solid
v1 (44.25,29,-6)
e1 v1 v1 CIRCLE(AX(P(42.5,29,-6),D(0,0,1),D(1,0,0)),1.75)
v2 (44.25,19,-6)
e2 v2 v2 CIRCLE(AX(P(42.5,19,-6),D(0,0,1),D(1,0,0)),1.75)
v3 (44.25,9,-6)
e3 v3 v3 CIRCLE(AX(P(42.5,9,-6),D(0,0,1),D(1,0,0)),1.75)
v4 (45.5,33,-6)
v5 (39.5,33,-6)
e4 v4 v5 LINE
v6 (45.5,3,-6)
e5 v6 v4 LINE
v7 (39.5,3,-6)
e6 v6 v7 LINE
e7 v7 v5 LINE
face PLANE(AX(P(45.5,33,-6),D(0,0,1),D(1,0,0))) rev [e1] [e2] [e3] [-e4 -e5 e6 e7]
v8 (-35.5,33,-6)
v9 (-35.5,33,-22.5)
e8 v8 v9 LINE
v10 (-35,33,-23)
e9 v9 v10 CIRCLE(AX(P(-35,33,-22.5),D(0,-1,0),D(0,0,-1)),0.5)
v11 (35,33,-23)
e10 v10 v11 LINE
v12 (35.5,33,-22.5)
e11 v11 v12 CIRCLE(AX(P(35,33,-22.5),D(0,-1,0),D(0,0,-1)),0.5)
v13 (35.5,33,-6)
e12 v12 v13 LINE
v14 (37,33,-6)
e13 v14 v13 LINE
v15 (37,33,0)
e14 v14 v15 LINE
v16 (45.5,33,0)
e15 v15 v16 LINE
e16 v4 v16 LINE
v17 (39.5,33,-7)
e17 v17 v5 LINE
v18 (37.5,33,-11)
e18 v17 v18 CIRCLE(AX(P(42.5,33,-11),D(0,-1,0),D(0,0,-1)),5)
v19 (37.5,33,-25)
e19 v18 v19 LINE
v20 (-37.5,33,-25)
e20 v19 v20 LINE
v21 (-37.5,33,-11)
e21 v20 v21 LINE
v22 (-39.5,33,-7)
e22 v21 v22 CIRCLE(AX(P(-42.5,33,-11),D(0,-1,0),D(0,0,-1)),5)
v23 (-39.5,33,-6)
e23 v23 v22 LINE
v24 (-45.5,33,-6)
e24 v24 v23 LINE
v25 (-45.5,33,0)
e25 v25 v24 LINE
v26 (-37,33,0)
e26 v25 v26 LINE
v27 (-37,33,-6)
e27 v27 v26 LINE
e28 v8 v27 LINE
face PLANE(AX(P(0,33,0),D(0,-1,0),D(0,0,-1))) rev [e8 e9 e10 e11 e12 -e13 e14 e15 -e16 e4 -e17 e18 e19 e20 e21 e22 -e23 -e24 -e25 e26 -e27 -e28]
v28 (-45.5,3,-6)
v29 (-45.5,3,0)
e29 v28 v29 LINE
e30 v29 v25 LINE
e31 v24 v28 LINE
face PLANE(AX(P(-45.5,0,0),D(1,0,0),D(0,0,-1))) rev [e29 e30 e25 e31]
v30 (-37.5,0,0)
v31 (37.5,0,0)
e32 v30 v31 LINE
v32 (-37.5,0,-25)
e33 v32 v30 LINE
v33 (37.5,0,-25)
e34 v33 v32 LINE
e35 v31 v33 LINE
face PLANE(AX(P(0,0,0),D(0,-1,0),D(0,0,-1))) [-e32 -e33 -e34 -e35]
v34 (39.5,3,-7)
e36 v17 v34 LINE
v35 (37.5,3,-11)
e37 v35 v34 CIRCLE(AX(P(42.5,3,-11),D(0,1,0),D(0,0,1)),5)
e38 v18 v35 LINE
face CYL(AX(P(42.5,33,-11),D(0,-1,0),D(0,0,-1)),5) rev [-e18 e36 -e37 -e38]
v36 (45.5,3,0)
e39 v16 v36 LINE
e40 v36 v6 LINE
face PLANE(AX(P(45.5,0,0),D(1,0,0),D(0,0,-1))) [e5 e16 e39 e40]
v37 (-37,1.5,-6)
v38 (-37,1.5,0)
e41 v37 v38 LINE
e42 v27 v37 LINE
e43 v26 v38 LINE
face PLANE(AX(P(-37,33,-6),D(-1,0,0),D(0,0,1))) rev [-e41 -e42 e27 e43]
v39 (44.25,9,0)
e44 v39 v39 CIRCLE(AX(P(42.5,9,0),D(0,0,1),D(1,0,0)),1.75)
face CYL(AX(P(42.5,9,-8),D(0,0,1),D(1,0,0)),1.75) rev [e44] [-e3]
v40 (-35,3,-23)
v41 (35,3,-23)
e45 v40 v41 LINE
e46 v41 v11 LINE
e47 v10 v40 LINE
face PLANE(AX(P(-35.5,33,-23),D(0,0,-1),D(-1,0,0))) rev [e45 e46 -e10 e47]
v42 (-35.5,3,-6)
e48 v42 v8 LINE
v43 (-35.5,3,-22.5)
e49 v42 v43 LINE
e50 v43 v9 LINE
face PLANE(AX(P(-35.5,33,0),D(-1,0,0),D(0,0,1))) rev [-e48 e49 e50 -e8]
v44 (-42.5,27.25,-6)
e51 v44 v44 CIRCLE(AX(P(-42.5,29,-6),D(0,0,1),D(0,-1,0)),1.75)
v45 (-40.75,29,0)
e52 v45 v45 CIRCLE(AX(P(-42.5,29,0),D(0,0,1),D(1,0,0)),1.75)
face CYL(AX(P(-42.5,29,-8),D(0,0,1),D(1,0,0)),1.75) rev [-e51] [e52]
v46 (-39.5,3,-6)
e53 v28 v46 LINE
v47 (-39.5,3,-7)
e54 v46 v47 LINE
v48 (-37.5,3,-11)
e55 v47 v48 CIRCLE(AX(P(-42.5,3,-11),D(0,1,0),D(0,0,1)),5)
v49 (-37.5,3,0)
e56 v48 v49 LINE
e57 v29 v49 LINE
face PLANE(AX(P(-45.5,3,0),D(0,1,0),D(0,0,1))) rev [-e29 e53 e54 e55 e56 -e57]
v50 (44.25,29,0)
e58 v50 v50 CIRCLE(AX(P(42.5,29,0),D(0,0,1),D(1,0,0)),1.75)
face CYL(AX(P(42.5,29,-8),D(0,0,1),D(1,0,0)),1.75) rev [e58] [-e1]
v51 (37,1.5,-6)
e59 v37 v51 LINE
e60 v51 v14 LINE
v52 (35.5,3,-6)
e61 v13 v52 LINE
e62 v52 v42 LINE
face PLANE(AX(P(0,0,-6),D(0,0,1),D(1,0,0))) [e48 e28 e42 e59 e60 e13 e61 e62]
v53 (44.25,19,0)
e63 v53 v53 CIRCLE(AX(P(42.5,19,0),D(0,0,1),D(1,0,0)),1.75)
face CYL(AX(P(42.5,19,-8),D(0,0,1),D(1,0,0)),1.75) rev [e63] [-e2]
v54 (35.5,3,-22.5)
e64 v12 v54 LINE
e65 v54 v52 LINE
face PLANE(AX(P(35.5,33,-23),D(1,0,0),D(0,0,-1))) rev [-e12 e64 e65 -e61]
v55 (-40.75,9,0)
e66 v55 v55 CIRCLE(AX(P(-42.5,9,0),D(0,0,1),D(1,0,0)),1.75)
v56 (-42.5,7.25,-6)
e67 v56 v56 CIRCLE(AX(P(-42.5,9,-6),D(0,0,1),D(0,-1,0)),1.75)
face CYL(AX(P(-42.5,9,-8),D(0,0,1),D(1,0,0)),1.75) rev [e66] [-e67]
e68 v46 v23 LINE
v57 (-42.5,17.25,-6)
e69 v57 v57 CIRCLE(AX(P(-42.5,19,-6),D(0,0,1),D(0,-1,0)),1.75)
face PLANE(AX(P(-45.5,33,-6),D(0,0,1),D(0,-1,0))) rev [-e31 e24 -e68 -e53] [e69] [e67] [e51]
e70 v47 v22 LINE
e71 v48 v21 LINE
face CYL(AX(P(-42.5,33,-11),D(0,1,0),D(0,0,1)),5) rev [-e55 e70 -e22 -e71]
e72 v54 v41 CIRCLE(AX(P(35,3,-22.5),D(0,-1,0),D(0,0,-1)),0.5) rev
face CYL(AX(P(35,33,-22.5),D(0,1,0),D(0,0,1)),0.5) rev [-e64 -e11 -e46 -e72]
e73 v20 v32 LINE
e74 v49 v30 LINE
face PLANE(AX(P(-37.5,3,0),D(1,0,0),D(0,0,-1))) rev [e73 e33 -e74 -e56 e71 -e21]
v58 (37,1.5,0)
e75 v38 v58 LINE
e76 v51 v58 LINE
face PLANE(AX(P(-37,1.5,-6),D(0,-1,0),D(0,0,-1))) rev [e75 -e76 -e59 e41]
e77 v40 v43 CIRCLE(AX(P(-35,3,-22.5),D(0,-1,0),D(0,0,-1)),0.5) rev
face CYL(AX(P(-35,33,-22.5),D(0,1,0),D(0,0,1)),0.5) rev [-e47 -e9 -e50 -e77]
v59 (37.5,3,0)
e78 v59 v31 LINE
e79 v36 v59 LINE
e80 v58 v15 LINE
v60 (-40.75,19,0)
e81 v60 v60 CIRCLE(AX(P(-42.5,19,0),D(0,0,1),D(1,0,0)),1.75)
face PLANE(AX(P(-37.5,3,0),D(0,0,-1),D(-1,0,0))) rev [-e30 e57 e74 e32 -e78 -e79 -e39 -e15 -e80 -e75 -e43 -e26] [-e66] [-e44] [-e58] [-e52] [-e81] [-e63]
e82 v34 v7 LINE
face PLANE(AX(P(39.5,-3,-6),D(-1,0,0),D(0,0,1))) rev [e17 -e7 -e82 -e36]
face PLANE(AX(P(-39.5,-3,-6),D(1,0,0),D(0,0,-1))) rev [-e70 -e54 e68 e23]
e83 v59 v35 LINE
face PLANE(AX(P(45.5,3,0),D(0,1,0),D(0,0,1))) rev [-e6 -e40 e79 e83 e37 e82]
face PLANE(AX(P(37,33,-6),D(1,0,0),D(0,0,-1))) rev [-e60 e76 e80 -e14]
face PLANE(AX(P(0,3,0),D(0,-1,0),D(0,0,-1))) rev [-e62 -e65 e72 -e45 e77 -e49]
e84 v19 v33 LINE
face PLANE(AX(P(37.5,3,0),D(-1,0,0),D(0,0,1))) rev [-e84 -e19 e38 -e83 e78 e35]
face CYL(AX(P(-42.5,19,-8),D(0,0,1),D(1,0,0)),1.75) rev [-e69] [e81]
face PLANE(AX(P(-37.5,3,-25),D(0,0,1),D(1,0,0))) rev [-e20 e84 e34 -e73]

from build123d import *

# Parameters (mm, degrees)
SKETCH2_W           = 75
SKETCH2_H           = 25
BOSS_EXTRUDE1_DEPTH = 3
BOSS_EXTRUDE2_DEPTH = 30
SKETCH5_W           = 6
SKETCH5_H           = 30
BOSS_EXTRUDE3_DEPTH = 8
SKETCH6_W           = 6
SKETCH6_H           = 30
BOSS_EXTRUDE4_DEPTH = 8
SKETCH8_R           = 1.75
CUT_EXTRUDE1_DEPTH  = 8
CUT_EXTRUDE2_DEPTH  = 6
FILLET1_R           = 5
FILLET2_R           = 5
SKETCH13_W          = 6
SKETCH13_H          = 2
CUT_EXTRUDE3_DEPTH  = 36
FILLET3_R           = 0.5


with BuildPart() as part:
    # Sketch2 → Boss-Extrude1 (new body)
    with BuildSketch(Plane(origin=(0, 0, 0), x_dir=(1, 0, 0), z_dir=(0, 1, 0))):
        with Locations((0, 12.5)):
            Rectangle(SKETCH2_W, SKETCH2_H)
    extrude(amount=BOSS_EXTRUDE1_DEPTH)

    # Sketch3 → Boss-Extrude2 (add)
    with BuildSketch(Plane(origin=(0, 3, 0), x_dir=(1, 0, 0), z_dir=(0, 1, 0))):
        Polygon((-35.5, 0), (-35.5, 23), (35.5, 23), (35.5, 0), (37.5, 0), (37.5, 25), (-37.5, 25), (-37.5, 0), align=None)
    extrude(amount=BOSS_EXTRUDE2_DEPTH)

    # Sketch5 → Boss-Extrude3 (add)
    with BuildSketch(Plane.ZY.offset(37.5)):
        with Locations((-3, 18)):
            Rectangle(SKETCH5_W, SKETCH5_H)
    extrude(amount=BOSS_EXTRUDE3_DEPTH)

    # Sketch6 → Boss-Extrude4 (add)
    with BuildSketch(Plane(origin=(37.5, 0, 0), x_dir=(0, 0, -1), z_dir=(1, 0, 0))):
        with Locations((3, 18)):
            Rectangle(SKETCH6_W, SKETCH6_H)
    extrude(amount=BOSS_EXTRUDE4_DEPTH)

    # Sketch8 → Cut-Extrude1 (cut)
    with BuildSketch(Plane.XY):
        with Locations((-42.5, 29)):
            Circle(SKETCH8_R)
        with Locations((42.5, 29)):
            Circle(SKETCH8_R)
        with Locations((-42.5, 19)):
            Circle(SKETCH8_R)
        with Locations((-42.5, 9)):
            Circle(SKETCH8_R)
        with Locations((42.5, 19)):
            Circle(SKETCH8_R)
        with Locations((42.5, 9)):
            Circle(SKETCH8_R)
    extrude(amount=-CUT_EXTRUDE1_DEPTH, mode=Mode.SUBTRACT)

    # Sketch12 → Cut-Extrude2 (cut)
    with BuildSketch(Plane.XY):
        Polygon((-35.5, 33), (-37, 33), (-37, 1.5), (37, 1.5), (37, 33), (35.5, 33), (35.5, 3), (-35.5, 3), align=None)
    extrude(amount=-CUT_EXTRUDE2_DEPTH, mode=Mode.SUBTRACT)

    # Fillet1
    # the kernel refuses this fillet: 5 mm, written as the material it adds along each edge
    with BuildSketch(Plane(origin=(-37.5, 33, -6), x_dir=(0, 0, -1), z_dir=(0, -1, 0))) as fillet1_piece_1_section:
        with BuildLine():
            CenterArc((FILLET1_R, -FILLET1_R), FILLET1_R, 90, 90)
            Line((0, -FILLET1_R), (0, 0))
            Line((0, 0), (FILLET1_R, 0))
        make_face()
    fillet1_piece_1 = extrude(amount=30, mode=Mode.PRIVATE)
    fillet1_piece_1 = fillet1_piece_1 - Plane(origin=(-42.5, 29, -7.147283254), x_dir=(1, 0, 0), z_dir=(0, 0, 1)) * Cylinder(1.75, 80, mode=Mode.PRIVATE)
    fillet1_piece_1 = fillet1_piece_1 - Plane(origin=(-42.5, 19, -7.147283254), x_dir=(1, 0, 0), z_dir=(0, 0, 1)) * Cylinder(1.75, 80, mode=Mode.PRIVATE)
    fillet1_piece_1 = fillet1_piece_1 - Plane(origin=(-42.5, 9, -7.147283254), x_dir=(1, 0, 0), z_dir=(0, 0, 1)) * Cylinder(1.75, 80, mode=Mode.PRIVATE)
    add(fillet1_piece_1)

    # Fillet2
    # the kernel refuses this fillet: 5 mm, written as the material it adds along each edge
    with BuildSketch(Plane(origin=(37.5, 33, -6), x_dir=(1, 0, 0), z_dir=(0, -1, 0))) as fillet2_piece_1_section:
        with BuildLine():
            CenterArc((FILLET2_R, -FILLET2_R), FILLET2_R, 90, 90)
            Line((0, -FILLET2_R), (0, 0))
            Line((0, 0), (FILLET2_R, 0))
        make_face()
    fillet2_piece_1 = extrude(amount=30, mode=Mode.PRIVATE)
    fillet2_piece_1 = fillet2_piece_1 - Plane(origin=(42.5, 9, -7.147283906), x_dir=(1, 0, 0), z_dir=(0, 0, 1)) * Cylinder(1.75, 80, mode=Mode.PRIVATE)
    fillet2_piece_1 = fillet2_piece_1 - Plane(origin=(42.5, 29, -7.147283906), x_dir=(1, 0, 0), z_dir=(0, 0, 1)) * Cylinder(1.75, 80, mode=Mode.PRIVATE)
    fillet2_piece_1 = fillet2_piece_1 - Plane(origin=(42.5, 19, -7.147283906), x_dir=(1, 0, 0), z_dir=(0, 0, 1)) * Cylinder(1.75, 80, mode=Mode.PRIVATE)
    add(fillet2_piece_1)

    # Sketch13 → Cut-Extrude3 (cut)
    with BuildSketch(Plane(origin=(0, 33, 0), x_dir=(1, 0, 0), z_dir=(0, 1, 0))):
        with Locations((-42.5, 7)):
            Rectangle(SKETCH13_W, SKETCH13_H)
        with Locations((42.5, 7)):
            Rectangle(SKETCH13_W, SKETCH13_H)
    extrude(amount=-CUT_EXTRUDE3_DEPTH, mode=Mode.SUBTRACT)

    # Fillet3
    fillet3_edges = [part.edges().sort_by_distance(p)[0] for p in [
        (-35.5, 18, -23),
        (35.5, 18, -23),
    ]]
    fillet(fillet3_edges, radius=FILLET3_R)


solid = part.part
